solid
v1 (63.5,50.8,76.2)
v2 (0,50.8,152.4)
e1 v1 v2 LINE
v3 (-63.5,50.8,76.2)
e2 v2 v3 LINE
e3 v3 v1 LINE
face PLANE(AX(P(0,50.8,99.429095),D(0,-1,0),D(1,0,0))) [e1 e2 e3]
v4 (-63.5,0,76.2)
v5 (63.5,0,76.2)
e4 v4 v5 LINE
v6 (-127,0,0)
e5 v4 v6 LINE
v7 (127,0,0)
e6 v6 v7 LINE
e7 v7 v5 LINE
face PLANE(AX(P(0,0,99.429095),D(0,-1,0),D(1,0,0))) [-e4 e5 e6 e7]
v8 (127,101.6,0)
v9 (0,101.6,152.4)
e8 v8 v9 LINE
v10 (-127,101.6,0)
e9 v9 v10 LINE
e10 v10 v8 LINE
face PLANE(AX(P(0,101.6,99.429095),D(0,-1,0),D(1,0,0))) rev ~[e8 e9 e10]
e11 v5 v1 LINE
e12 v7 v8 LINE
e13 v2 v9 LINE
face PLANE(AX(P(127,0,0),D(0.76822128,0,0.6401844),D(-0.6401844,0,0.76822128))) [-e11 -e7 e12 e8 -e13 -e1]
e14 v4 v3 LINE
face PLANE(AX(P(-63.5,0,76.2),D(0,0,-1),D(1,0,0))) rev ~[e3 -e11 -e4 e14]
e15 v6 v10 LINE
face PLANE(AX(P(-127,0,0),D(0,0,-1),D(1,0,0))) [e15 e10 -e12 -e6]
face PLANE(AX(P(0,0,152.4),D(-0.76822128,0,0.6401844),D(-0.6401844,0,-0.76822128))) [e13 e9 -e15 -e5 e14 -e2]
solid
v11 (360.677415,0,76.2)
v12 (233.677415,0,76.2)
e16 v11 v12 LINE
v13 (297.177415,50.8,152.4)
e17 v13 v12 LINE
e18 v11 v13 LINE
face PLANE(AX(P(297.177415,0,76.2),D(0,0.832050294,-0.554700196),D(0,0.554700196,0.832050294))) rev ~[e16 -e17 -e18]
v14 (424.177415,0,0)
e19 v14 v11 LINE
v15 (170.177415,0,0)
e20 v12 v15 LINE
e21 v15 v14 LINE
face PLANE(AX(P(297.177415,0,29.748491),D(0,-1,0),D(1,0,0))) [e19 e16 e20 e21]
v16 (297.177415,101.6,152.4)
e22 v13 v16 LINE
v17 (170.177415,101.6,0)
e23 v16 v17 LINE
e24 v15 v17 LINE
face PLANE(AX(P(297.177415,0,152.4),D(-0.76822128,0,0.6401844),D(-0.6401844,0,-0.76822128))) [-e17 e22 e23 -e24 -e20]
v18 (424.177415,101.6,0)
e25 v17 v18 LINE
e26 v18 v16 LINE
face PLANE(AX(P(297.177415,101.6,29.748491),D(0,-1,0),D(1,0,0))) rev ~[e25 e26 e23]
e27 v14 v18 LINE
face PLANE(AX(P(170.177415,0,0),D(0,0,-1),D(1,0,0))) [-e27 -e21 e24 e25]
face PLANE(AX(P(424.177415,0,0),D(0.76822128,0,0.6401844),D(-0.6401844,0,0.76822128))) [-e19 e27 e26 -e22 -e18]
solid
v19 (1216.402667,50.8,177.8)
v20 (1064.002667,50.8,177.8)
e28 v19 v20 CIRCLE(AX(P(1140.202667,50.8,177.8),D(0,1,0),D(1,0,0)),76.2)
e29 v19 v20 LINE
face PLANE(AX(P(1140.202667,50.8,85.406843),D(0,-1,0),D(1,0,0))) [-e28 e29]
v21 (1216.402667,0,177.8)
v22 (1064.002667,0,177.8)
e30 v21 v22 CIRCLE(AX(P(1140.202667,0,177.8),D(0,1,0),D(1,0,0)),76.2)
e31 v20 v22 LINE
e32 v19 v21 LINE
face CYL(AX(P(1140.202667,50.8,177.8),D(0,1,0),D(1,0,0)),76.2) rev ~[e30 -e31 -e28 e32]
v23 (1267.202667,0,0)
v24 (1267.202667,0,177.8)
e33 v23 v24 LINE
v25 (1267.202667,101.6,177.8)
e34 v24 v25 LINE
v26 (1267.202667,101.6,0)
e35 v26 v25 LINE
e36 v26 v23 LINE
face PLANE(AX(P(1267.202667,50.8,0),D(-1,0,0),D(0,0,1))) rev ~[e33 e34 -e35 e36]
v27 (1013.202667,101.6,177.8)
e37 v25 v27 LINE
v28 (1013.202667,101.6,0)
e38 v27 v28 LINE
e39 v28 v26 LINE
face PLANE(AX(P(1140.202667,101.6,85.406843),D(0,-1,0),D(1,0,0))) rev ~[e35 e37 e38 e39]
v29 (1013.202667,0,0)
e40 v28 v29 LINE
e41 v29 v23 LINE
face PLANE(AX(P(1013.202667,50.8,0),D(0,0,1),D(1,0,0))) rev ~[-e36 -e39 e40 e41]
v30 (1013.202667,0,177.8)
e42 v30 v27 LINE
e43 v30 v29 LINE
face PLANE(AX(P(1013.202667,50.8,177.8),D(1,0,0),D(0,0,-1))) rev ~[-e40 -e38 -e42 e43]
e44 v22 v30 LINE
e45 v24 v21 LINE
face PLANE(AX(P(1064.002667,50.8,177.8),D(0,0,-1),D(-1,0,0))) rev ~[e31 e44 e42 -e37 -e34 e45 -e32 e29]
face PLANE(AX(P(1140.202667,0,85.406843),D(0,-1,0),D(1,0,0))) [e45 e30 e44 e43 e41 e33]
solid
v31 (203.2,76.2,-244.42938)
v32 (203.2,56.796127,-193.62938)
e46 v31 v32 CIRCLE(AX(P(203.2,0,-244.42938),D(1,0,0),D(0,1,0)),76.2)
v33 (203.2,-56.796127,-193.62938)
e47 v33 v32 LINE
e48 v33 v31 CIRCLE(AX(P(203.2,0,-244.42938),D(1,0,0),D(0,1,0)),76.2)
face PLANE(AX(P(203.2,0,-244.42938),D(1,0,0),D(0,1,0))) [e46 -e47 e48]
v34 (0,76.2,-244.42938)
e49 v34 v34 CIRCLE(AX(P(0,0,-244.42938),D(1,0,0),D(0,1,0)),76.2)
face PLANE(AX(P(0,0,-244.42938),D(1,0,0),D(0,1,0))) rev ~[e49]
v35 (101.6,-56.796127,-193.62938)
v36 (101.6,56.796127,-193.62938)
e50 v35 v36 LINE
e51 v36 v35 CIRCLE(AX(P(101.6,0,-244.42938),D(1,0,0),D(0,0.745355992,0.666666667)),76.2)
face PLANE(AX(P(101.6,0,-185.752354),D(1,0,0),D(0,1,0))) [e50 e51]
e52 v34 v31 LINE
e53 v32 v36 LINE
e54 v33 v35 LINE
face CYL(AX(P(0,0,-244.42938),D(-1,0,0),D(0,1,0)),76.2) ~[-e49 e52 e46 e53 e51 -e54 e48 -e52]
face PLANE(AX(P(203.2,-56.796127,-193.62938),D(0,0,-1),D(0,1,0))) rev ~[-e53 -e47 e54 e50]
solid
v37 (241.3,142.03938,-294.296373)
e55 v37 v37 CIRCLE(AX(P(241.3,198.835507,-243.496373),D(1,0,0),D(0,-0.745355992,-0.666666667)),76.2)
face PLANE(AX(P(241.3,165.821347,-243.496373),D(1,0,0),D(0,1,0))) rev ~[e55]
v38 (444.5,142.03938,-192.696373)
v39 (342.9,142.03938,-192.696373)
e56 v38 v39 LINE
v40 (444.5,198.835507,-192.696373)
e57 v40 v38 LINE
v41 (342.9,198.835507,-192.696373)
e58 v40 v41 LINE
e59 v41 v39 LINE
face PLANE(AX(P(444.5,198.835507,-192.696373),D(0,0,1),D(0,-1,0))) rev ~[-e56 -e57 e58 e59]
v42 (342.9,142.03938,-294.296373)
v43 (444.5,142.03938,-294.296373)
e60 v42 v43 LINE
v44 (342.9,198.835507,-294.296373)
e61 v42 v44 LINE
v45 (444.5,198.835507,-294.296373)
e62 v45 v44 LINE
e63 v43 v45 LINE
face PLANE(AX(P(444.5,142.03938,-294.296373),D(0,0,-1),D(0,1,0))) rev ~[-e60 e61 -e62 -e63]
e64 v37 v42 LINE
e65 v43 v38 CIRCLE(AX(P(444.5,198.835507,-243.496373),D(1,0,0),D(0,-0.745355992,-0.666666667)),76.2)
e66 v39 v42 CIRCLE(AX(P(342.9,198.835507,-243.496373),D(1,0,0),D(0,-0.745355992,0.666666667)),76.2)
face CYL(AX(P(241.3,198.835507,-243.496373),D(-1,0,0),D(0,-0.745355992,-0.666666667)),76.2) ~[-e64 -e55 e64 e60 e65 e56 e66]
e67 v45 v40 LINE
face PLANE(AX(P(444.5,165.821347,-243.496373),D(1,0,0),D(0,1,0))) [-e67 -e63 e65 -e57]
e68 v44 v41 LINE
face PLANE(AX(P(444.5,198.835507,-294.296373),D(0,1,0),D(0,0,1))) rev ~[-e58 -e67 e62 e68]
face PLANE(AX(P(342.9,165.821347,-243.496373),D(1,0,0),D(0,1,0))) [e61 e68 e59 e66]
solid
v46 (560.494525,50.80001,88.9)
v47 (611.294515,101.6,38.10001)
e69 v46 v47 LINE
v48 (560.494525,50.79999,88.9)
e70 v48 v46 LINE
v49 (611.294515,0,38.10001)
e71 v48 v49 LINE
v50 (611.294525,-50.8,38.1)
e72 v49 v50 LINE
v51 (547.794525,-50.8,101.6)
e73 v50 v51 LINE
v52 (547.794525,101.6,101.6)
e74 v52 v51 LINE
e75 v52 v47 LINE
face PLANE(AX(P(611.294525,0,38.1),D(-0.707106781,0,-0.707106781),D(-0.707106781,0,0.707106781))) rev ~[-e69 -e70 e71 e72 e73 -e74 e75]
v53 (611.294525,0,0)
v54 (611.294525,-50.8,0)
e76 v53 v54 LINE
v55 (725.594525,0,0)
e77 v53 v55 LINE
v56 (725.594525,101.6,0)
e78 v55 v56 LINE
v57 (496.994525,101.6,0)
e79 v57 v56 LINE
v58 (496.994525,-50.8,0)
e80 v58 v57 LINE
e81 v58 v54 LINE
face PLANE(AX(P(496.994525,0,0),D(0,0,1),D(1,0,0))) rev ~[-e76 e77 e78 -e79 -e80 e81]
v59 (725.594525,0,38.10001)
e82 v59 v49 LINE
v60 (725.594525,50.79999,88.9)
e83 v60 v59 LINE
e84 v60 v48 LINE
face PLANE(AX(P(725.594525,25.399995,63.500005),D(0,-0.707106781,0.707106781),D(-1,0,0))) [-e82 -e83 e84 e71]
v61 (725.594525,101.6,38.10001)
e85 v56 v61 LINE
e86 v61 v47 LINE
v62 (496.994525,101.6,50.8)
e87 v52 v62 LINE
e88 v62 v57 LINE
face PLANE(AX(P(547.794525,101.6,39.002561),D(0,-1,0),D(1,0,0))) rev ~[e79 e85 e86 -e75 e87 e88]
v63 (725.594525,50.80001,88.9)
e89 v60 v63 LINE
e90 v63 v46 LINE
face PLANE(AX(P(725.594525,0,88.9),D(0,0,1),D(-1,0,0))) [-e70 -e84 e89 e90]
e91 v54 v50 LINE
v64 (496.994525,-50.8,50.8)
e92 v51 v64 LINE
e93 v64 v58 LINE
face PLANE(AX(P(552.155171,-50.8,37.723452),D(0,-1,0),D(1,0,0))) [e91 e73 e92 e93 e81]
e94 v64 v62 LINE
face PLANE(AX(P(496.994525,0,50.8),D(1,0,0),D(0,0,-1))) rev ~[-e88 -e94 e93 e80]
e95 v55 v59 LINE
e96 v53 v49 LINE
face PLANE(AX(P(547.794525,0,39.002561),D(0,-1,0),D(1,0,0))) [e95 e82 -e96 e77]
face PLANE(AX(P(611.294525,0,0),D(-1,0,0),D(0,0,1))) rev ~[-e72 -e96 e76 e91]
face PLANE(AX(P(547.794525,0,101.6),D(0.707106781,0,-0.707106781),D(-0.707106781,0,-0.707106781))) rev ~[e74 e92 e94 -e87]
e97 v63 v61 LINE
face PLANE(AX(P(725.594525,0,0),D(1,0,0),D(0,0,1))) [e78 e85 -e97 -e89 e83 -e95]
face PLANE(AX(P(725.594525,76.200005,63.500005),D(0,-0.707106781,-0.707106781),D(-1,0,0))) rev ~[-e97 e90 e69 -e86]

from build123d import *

# Parameters (mm, degrees)
F1_DEPTH   = 101.6
F3_DEPTH   = 50.8
F5_DEPTH   = 101.6
F6_W       = 127
F6_H       = 50.8
F7_DEPTH   = 101.6
F8_SIZE    = 50.79999
F10_DEPTH  = 101.6
F11_DEPTH  = 101.6
F11_FACE_W = 254
F11_FACE_H = 177.8
F12_DEPTH  = 50.8
F14_DEPTH  = 50.8
F16_DEPTH  = 50.8
F17_R      = 76.2
F18_DEPTH  = 203.2
F20_DEPTH  = 101.6
F23_DEPTH  = 203.2
F25_DEPTH  = 101.6
F29_DEPTH  = 76.2


# Not quite as in the source:
# - a fillet or chamfer is up to 0.001 mm smaller than in the source, because OpenCascade refuses the exact size
# - ends of sketch curves that miss each other by under 0.0002 mm in the source are joined


with BuildPart() as f1:
    # F0 (on Front) → F1 (new body)
    with BuildSketch(Plane.XZ):
        Polygon((0, 152.4), (-63.5, 76.2), (0, 76.2), (63.5, 76.2), align=None)
        Polygon((-127, 0), (0, 0), (127, 0), (63.5, 76.2), (0, 76.2), (-63.5, 76.2), align=None)
    extrude(amount=-F1_DEPTH)

    # F2 (on face) → F3 (cut)
    with BuildSketch(Plane.XZ):
        Polygon((-63.5, 76.2), (0, 76.2), (63.5, 76.2), (0, 152.4), align=None)
    extrude(amount=-F3_DEPTH, mode=Mode.SUBTRACT)


with BuildPart() as f5:
    # F4 (on Front) → F5 (new body)
    with BuildSketch(Plane.XZ):
        Polygon((233.6774150133, 76.2), (170.1774150133, 0), (424.1774150133, 0), (360.6774150133, 76.2), (297.1774150133, 76.2), align=None)
        Polygon((297.1774150133, 152.4), (233.6774150133, 76.2), (297.1774150133, 76.2), (360.6774150133, 76.2), align=None)
    extrude(amount=-F5_DEPTH)

    # F28 (on 3pt) → F29 (cut, symmetric)
    with BuildSketch(Plane.YZ.offset(297.1774150133)):
        Polygon((50.8, 152.4), (0, 152.4), (0, 76.2), align=None)
    extrude(amount=F29_DEPTH, both=True, mode=Mode.SUBTRACT)


with BuildPart() as f7:
    # F6 (on Front) → F7 (new body)
    with BuildSketch(Plane.XZ):
        Polygon((496.9945251942, 50.8), (496.9945251942, 0), (598.5945251942, 0), (598.5945251942, 50.8), (560.4945251942, 88.9), (547.7945251942, 101.6), align=None)
        Polygon((560.4945251942, 88.9), (598.5945251942, 50.8), (725.5945251942, 50.8), (725.5945251942, 88.9), align=None)
        with Locations((662.0945251942, 25.4)):
            Rectangle(F6_W, F6_H)
    extrude(amount=-F7_DEPTH)

    # F8 (size 50.8 in the source; OpenCascade refuses exactly that, so slightly less here)
    f8_edges = [f7.edges().sort_by_distance(p)[0] for p in [
        (643.044525, 0, 88.9),
        (643.044525, 101.6, 88.9),
    ]]
    chamfer(f8_edges, length=F8_SIZE)

    # F15 (on face) → F16 (join)
    with BuildSketch(Plane.XZ):
        Polygon((611.2945251942, 0), (611.2945251942, 38.1), (560.4945251942, 88.9), (547.7945251942, 101.6), (496.9945251942, 50.8), (496.9945251942, 0), align=None)
    extrude(amount=F16_DEPTH)


with BuildPart() as f10:
    # F9 (on Front) → F10 (new body)
    with BuildSketch(Plane.XZ):
        with BuildLine():
            Line((1013.2026672363, 177.8), (1013.2026672363, 0))
            Line((1013.2026672363, 0), (1267.2026672363, 0))
            Line((1267.2026672363, 0), (1267.2026672363, 177.8))
            Line((1267.2026672363, 177.8), (1216.4026672363, 177.8))
            ThreePointArc((1216.4026672363, 177.8), (1140.2026672363, 101.6), (1064.0026672363, 177.8))
            Line((1064.0026672363, 177.8), (1013.2026672363, 177.8))
        make_face()
    extrude(amount=-F10_DEPTH)

    # F9 (on Front) → F11 (join)
    with BuildSketch(Plane.XZ):
        with BuildLine():
            Line((1013.2026672363, 177.8), (1013.2026672363, 0))
            Line((1013.2026672363, 0), (1267.2026672363, 0))
            Line((1267.2026672363, 0), (1267.2026672363, 177.8))
            Line((1267.2026672363, 177.8), (1216.4026672363, 177.8))
            ThreePointArc((1216.4026672363, 177.8), (1140.2026672363, 101.6), (1064.0026672363, 177.8))
            Line((1064.0026672363, 177.8), (1013.2026672363, 177.8))
        make_face()
        with BuildLine():
            Line((1216.4026672363, 177.8), (1064.0026672363, 177.8))
            ThreePointArc((1064.0026672363, 177.8), (1140.2026672363, 101.6), (1216.4026672363, 177.8))
        make_face()
    extrude(amount=-F11_DEPTH)

    # F9 (on Front) + F11_face (on face) → F12 (cut)
    with BuildSketch(Plane.XZ):
        with BuildLine():
            Line((1013.2026672363, 177.8), (1013.2026672363, 0))
            Line((1013.2026672363, 0), (1267.2026672363, 0))
            Line((1267.2026672363, 0), (1267.2026672363, 177.8))
            Line((1267.2026672363, 177.8), (1216.4026672363, 177.8))
            ThreePointArc((1216.4026672363, 177.8), (1140.2026672363, 101.6), (1064.0026672363, 177.8))
            Line((1064.0026672363, 177.8), (1013.2026672363, 177.8))
        make_face()
        with BuildLine():
            Line((1216.4026672363, 177.8), (1064.0026672363, 177.8))
            ThreePointArc((1064.0026672363, 177.8), (1140.2026672363, 101.6), (1216.4026672363, 177.8))
        make_face()
    with BuildSketch(Plane(origin=(1140.2026672363, 0, 88.9), x_dir=(1, 0, 0), z_dir=(0, -1, 0))):
        Rectangle(F11_FACE_W, F11_FACE_H)
    extrude(amount=-F12_DEPTH, mode=Mode.SUBTRACT)

    # F13 (on face) → F14 (join)
    with BuildSketch(Plane.XZ.offset(-50.8)):
        with BuildLine():
            Line((1013.2026672363, 177.8), (1013.2026672363, 0))
            Line((1013.2026672363, 0), (1267.2026672363, 0))
            Line((1267.2026672363, 0), (1267.2026672363, 177.8))
            Line((1267.2026672363, 177.8), (1216.4026672363, 177.8))
            ThreePointArc((1216.4026672363, 177.8), (1140.2026672363, 101.6), (1064.0026672363, 177.8))
            Line((1064.0026672363, 177.8), (1013.2026672363, 177.8))
        make_face()
    extrude(amount=F14_DEPTH)


with BuildPart() as f18:
    # F17 (on Right) → F18 (new body)
    with BuildSketch(Plane.YZ):
        with Locations((0, -244.4293797016)):
            Circle(F17_R)
    extrude(amount=F18_DEPTH)

    # F19 (on face) → F20 (cut)
    with BuildSketch(Plane.YZ.offset(203.2)):
        with BuildLine():
            Line((-56.7961266285, -193.6293797016), (0, -193.6293797016))
            Line((0, -193.6293797016), (56.7961266285, -193.6293797016))
            ThreePointArc((56.7961266285, -193.6293797016), (0, -168.2293797016), (-56.7961266285, -193.6293797016))
        make_face()
    extrude(amount=-F20_DEPTH, mode=Mode.SUBTRACT)


with BuildPart() as f23:
    # F22 (on offset) → F23 (new body)
    with BuildSketch(Plane.YZ.offset(241.3)):
        with BuildLine():
            Line((198.8355070353, -192.6963732958), (142.0393804068, -192.6963732958))
            ThreePointArc((142.0393804068, -192.6963732958), (122.6355070353, -243.4963732958), (142.0393804068, -294.2963732958))
            Line((142.0393804068, -294.2963732958), (198.8355070353, -294.2963732958))
            Line((198.8355070353, -294.2963732958), (198.8355070353, -243.4963732958))
            Line((198.8355070353, -243.4963732958), (198.8355070353, -192.6963732958))
        make_face()
        with BuildLine():
            ThreePointArc((142.0393804068, -294.2963732958), (226.025350276, -314.6803070487), (275.0355070353, -243.4963732958))
            ThreePointArc((275.0355070353, -243.4963732958), (226.025350276, -172.3124395428), (142.0393804068, -192.6963732958))
            Line((142.0393804068, -192.6963732958), (198.8355070353, -192.6963732958))
            Line((198.8355070353, -192.6963732958), (198.8355070353, -243.4963732958))
            Line((198.8355070353, -243.4963732958), (198.8355070353, -294.2963732958))
            Line((198.8355070353, -294.2963732958), (142.0393804068, -294.2963732958))
        make_face()
    extrude(amount=F23_DEPTH)

    # F24 (on face) → F25 (cut)
    with BuildSketch(Plane.YZ.offset(444.5)):
        with BuildLine():
            Line((198.8355070353, -294.2963732958), (198.8355070353, -243.4963732958))
            Line((198.8355070353, -243.4963732958), (198.8355070353, -192.6963732958))
            Line((198.8355070353, -192.6963732958), (142.0393804068, -192.6963732958))
            ThreePointArc((142.0393804068, -192.6963732958), (122.6355070353, -243.4963732958), (142.0393804068, -294.2963732958))
            Line((142.0393804068, -294.2963732958), (198.8355070353, -294.2963732958))
        make_face()
    extrude(amount=-F25_DEPTH, mode=Mode.SUBTRACT)


solid = Compound([f1.part, f5.part, f7.part, f10.part, f18.part, f23.part])
